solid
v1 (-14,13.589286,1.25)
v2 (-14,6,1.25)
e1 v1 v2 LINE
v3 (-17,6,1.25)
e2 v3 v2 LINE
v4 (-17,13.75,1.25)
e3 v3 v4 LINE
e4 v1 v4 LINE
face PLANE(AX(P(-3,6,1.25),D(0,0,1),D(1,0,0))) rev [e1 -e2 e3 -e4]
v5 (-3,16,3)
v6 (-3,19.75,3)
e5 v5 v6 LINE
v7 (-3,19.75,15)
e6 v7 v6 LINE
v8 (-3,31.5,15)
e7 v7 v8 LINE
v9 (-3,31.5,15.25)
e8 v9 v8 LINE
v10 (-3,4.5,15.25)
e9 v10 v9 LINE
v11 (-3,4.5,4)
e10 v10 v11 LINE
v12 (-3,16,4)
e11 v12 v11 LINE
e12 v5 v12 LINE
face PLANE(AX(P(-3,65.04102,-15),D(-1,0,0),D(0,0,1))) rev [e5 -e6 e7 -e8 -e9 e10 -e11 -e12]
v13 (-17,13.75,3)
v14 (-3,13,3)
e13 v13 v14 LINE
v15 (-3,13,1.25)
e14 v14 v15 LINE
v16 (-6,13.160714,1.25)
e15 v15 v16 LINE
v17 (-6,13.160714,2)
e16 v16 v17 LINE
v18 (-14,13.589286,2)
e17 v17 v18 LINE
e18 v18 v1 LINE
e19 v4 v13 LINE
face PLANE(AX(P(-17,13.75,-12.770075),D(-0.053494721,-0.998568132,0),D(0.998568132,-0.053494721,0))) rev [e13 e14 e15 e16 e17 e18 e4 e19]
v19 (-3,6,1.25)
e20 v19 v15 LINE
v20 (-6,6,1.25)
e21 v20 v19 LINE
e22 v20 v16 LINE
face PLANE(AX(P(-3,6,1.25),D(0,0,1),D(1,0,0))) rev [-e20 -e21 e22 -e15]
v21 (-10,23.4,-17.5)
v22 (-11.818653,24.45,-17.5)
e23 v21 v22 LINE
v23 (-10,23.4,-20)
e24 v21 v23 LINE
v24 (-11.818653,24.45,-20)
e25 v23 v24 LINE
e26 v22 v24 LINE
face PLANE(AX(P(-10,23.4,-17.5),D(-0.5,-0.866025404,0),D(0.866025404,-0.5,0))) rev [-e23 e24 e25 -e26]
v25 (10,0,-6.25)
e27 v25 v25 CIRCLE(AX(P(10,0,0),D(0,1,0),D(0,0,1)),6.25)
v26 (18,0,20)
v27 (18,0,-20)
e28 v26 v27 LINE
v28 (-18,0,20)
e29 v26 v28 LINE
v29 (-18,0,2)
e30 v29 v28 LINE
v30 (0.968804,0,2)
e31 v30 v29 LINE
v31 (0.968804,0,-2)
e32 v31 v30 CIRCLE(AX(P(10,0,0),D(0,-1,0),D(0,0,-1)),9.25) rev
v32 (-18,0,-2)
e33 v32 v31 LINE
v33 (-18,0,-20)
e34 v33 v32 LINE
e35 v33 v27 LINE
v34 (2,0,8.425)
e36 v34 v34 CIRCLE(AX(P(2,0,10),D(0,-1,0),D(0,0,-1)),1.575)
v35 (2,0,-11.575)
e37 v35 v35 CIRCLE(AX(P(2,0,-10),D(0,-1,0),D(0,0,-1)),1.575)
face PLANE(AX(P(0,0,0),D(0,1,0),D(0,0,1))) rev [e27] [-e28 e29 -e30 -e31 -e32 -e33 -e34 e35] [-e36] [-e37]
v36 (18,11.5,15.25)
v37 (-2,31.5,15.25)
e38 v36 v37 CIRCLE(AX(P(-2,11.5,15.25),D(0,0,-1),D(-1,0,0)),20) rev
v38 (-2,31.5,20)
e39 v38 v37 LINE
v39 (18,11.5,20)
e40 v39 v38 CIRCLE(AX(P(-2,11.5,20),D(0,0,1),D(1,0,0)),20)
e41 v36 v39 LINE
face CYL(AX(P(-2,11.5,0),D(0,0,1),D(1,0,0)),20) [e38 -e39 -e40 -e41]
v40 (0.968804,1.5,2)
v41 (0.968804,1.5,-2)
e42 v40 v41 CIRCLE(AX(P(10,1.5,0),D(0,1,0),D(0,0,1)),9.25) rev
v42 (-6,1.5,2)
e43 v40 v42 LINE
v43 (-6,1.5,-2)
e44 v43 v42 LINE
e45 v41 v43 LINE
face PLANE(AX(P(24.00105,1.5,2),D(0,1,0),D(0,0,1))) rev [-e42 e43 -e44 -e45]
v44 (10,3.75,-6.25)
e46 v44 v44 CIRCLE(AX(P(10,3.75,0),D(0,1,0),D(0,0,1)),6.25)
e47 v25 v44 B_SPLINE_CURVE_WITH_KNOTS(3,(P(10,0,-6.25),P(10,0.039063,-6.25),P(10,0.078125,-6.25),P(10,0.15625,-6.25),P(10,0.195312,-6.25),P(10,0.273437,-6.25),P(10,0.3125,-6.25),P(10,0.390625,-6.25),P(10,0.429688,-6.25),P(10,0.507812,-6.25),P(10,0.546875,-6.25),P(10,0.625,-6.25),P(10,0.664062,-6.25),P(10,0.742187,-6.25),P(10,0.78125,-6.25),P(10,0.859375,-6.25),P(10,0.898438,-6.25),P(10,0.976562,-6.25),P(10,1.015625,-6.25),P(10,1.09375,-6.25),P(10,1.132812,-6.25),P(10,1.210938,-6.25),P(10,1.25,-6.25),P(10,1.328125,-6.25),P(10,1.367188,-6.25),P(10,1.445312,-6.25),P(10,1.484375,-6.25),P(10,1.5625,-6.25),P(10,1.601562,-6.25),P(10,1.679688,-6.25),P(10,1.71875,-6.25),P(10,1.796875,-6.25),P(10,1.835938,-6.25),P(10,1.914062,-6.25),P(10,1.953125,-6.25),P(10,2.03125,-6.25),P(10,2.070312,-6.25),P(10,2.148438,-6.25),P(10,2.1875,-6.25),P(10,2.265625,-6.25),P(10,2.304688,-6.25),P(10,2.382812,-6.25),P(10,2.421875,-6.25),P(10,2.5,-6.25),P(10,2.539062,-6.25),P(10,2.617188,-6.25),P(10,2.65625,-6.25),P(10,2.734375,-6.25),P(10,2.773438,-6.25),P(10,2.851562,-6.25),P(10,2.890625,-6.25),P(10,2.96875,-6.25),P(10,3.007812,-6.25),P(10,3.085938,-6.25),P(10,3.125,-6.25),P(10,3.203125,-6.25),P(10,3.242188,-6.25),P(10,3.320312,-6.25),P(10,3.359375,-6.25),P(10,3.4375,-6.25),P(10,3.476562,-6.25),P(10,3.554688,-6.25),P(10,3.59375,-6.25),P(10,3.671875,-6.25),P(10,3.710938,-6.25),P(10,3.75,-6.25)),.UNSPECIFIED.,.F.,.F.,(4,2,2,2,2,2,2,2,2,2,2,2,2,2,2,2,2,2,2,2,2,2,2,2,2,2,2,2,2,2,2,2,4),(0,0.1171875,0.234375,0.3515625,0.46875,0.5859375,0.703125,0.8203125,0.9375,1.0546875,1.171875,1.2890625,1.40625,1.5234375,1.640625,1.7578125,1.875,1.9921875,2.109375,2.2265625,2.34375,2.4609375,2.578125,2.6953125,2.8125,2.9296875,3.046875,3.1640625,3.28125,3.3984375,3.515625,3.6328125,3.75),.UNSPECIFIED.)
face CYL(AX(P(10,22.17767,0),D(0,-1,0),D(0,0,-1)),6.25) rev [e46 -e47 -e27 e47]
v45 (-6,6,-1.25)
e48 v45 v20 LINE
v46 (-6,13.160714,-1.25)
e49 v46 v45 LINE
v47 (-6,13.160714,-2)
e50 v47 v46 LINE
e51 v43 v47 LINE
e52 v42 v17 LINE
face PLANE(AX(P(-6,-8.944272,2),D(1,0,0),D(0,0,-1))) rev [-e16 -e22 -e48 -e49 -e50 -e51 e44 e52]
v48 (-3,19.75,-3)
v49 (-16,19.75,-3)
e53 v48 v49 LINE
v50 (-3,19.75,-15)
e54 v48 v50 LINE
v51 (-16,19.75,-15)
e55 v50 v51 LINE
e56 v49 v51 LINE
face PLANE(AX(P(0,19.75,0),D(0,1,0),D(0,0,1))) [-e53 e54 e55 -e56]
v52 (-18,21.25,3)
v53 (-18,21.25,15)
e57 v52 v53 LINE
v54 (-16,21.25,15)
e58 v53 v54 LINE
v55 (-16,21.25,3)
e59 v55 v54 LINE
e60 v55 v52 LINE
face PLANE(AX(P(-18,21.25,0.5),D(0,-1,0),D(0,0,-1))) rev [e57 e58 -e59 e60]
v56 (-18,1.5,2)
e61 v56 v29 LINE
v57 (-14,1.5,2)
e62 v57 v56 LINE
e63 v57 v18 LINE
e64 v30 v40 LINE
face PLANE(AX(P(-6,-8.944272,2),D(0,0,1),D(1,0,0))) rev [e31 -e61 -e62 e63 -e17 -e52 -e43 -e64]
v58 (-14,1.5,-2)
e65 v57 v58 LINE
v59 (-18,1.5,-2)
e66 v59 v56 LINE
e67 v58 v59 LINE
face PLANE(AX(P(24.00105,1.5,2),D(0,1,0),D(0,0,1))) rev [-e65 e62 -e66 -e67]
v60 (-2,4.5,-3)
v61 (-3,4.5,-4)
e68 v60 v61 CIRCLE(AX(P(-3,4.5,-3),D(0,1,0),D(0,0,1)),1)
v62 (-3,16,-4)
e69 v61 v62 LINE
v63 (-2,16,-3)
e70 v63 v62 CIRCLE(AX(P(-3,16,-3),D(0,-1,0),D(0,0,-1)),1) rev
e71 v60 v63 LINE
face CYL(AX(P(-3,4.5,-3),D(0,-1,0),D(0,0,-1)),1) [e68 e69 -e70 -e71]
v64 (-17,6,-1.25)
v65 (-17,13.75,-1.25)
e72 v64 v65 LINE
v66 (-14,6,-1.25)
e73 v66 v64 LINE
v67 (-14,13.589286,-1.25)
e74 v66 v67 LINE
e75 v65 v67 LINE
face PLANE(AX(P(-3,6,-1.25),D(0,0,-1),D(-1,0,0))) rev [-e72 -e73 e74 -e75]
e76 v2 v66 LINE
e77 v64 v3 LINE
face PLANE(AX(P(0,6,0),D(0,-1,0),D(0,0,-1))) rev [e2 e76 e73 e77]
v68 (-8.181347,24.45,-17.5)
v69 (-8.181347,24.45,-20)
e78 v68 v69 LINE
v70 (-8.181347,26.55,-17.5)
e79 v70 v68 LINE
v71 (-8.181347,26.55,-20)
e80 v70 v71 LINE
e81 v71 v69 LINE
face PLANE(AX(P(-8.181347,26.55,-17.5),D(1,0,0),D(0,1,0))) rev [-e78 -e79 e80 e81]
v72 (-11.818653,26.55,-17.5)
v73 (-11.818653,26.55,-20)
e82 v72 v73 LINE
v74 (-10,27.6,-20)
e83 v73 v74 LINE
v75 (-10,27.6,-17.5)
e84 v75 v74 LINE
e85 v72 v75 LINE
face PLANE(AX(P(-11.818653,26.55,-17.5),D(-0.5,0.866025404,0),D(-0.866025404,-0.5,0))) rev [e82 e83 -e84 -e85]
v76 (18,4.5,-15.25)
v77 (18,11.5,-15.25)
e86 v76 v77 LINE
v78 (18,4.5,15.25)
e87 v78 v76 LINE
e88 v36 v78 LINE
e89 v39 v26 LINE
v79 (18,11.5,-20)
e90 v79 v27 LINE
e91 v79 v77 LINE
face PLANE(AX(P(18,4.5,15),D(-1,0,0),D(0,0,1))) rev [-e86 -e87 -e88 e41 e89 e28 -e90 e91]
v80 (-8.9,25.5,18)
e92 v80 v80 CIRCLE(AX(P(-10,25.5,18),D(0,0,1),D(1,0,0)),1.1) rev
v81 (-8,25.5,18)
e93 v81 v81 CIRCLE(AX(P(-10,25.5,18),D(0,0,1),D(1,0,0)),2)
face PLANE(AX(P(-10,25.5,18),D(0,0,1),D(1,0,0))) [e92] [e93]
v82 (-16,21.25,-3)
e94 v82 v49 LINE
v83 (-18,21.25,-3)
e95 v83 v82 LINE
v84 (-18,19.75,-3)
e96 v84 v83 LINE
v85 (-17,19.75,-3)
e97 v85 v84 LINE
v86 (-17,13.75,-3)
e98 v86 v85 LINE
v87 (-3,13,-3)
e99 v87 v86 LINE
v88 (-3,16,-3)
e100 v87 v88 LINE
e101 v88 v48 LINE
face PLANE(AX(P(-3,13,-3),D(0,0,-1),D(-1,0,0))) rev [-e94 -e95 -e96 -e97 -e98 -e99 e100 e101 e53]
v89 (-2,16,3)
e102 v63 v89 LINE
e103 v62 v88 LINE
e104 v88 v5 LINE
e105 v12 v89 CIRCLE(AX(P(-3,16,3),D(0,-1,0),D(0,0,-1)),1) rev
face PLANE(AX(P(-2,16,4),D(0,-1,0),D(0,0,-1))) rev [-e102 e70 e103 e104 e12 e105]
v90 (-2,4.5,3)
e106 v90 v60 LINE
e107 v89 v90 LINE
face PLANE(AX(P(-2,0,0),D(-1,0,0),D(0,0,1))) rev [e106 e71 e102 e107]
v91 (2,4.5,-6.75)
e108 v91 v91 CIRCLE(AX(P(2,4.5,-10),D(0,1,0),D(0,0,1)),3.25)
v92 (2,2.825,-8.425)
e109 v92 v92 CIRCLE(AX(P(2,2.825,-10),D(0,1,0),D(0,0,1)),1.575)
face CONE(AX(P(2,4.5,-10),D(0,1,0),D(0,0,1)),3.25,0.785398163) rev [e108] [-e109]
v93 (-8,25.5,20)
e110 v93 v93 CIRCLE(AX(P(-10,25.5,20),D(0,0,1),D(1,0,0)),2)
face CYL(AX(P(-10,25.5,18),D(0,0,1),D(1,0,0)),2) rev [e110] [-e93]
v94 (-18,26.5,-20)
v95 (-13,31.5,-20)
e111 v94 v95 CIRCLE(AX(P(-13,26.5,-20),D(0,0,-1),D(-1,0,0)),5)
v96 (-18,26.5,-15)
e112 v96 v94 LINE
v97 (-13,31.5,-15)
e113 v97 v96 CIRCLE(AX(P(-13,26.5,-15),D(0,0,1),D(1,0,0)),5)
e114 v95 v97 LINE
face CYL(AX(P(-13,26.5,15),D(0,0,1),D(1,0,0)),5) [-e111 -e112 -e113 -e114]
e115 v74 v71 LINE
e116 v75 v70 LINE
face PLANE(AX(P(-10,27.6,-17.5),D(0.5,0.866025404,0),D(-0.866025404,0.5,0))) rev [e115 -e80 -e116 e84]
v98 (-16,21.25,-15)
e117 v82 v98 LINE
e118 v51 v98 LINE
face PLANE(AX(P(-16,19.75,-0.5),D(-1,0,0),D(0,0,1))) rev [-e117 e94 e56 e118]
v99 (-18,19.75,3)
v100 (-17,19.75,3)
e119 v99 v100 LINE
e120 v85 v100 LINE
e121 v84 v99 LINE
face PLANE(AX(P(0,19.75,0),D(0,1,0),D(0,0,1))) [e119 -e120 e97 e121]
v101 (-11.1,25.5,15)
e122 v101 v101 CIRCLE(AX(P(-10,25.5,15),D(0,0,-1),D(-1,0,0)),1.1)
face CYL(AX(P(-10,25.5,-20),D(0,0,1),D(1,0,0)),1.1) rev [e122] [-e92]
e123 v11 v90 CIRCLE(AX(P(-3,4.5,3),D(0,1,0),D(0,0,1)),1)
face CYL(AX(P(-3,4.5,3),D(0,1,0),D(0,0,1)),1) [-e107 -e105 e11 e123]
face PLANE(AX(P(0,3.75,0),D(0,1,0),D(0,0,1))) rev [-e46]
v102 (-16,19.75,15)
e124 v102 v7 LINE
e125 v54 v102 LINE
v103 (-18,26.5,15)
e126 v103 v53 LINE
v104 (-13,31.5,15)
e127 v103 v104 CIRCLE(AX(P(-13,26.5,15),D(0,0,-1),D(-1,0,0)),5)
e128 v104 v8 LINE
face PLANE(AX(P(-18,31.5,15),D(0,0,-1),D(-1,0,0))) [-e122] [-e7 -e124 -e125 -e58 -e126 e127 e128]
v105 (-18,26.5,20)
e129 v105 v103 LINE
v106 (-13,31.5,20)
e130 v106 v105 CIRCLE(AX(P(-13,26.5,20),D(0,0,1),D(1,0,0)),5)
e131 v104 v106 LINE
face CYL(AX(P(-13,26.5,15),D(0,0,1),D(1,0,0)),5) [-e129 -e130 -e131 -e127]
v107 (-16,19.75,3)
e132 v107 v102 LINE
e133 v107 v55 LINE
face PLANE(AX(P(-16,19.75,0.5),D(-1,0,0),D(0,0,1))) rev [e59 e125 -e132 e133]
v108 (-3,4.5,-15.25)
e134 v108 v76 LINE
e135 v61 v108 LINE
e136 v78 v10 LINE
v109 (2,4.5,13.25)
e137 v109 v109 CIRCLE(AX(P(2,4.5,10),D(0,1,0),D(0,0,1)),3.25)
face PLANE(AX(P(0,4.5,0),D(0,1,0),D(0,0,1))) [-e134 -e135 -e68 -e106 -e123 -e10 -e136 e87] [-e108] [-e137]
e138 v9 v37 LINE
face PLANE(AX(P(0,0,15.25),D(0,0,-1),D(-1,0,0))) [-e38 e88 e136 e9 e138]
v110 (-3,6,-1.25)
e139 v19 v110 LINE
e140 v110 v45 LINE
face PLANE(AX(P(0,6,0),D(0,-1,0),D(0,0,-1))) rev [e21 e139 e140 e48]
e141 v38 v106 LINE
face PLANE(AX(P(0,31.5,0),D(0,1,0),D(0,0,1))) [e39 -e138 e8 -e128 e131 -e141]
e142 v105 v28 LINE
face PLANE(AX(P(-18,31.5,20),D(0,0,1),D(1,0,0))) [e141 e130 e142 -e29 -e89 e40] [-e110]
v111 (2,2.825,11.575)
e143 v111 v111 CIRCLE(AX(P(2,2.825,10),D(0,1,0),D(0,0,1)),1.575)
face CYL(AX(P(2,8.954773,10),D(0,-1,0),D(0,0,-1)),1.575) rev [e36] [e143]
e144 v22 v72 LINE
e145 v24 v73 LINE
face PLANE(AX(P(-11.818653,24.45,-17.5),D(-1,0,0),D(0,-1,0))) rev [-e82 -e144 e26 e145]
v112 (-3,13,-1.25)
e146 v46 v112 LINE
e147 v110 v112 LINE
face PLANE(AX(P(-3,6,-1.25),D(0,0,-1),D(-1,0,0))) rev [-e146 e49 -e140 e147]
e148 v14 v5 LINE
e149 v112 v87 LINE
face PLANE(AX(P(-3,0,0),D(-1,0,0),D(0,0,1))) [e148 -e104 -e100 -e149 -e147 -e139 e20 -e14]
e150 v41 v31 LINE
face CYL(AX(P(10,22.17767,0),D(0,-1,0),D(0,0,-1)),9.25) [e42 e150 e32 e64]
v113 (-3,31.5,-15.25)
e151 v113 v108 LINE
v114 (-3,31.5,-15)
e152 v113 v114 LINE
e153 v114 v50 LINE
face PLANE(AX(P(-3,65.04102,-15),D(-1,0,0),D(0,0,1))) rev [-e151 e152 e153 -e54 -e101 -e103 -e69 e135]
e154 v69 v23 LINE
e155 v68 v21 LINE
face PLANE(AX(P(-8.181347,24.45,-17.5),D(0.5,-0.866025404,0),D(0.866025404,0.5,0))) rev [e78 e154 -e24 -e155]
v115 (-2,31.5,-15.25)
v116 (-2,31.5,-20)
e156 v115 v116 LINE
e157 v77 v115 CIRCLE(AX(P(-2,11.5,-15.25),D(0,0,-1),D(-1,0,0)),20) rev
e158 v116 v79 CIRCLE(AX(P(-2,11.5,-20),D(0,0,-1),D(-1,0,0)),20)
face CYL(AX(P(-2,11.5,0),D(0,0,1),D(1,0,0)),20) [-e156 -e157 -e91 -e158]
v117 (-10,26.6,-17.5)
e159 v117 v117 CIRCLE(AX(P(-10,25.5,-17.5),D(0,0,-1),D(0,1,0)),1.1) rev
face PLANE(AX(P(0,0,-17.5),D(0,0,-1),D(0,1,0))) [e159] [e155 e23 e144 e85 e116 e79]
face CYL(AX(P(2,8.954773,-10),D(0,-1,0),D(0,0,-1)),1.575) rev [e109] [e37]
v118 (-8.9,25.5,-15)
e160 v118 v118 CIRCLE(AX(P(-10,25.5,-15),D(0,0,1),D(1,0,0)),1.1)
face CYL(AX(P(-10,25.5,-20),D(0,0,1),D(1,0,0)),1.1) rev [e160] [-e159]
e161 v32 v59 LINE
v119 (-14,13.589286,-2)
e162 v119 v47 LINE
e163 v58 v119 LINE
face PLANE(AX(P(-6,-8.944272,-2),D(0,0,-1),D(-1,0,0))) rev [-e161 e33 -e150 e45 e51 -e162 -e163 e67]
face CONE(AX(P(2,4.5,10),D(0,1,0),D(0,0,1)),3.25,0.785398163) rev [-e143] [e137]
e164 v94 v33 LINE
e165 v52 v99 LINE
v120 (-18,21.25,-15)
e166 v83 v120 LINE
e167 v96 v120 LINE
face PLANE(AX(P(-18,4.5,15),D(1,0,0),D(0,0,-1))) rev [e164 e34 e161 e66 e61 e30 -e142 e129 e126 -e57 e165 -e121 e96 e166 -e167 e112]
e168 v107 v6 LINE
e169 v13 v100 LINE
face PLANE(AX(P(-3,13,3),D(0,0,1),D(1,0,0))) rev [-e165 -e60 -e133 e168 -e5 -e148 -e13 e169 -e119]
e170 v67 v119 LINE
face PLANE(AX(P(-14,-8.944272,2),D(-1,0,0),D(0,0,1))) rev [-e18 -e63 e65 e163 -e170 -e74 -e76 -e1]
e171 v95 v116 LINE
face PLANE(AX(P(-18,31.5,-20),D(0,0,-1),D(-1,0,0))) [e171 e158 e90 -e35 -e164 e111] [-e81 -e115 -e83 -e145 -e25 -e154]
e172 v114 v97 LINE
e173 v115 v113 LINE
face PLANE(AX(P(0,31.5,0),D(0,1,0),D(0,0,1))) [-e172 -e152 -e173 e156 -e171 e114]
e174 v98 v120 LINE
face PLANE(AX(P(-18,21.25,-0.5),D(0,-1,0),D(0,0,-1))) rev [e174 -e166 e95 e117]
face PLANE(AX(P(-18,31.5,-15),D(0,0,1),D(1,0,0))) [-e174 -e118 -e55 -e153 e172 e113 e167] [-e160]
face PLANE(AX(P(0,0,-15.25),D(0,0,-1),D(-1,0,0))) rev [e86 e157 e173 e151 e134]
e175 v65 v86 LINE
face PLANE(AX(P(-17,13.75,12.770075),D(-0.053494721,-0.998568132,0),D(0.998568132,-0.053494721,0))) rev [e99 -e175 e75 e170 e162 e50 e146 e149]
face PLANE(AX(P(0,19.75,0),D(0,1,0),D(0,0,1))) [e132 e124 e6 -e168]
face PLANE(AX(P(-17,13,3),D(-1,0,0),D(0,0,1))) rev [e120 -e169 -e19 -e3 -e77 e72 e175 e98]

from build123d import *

# Parameters (mm, degrees)
BASE_W                              = 36
BASE_H                              = 30
BOSS_EXTRUDE1_DEPTH                 = 4.5
WALLS_W                             = 36
WALLS_H                             = 5
WALLS_EXT_DEPTH                     = 31.5
SWITCH_BLOCK_W                      = 15
SWITCH_BLOCK_H                      = 30
SWITCH_BLOCK_EXT_DEPTH              = 15.25
MAGNET_POCKET_R                     = 6.25
MAGNET_POCKET_CUT_DEPTH             = 3.75
FILLET1_R                           = 5
FILLET2_R                           = 5
FILLET3_R                           = 20
FILLET4_R                           = 20
SWITCH_PLACE_W                      = 14
SWITCH_PLACE_H                      = 6
SWITCH_POCKET_DEPTH                 = 6.75
SWITCH_CONTACTS_W                   = 14
SWITCH_CONTACTS_H                   = 2.5
SWITCH_LEADS_DEPTH                  = 7
SWITCH_ANGLE_LEFT_DEPTH             = 1.75
SWITCH_ANGLE_RIGHT_DEPTH            = 1.75
WIRE_GUIDE_W                        = 8
WIRE_GUIDE_H                        = 4
WIRE_PASS_THROUGH_DEPTH             = 6
WIRE_PASS_THROUGH_DIRECTION_2_REACH = 39.071
WIRE_CHANNEL_OUTLINE_W              = 4
WIRE_CHANNEL_OUTLINE_H              = 4
WIRE_CHANNEL_DEPTH                  = 1.5
ACHSE_R                             = 1.1
M2_ACHSE_DEPTH                      = 55.002314765
M2_NUT_DEPTH                        = 2.5
SKETCH2_R                           = 1.575
M3_MOUNTING_SCREWS_DEPTH            = 4.5
SKETCH9_W                           = 2
SKETCH9_H                           = 1.5
BOSS_EXTRUDE3_DEPTH                 = 12
SKETCH10_W                          = 2
SKETCH10_H                          = 1.5
BOSS_EXTRUDE4_DEPTH                 = 12
SKETCH18_W                          = 8
SKETCH18_H                          = 11.5
BOSS_EXTRUDE5_DEPTH                 = 1
FILLET5_R                           = 1
FILLET6_R                           = 1
SKETCH19_W                          = 21
SKETCH19_H                          = 27
CUT_EXTRUDE1_DEPTH                  = 0.25
SKETCH20_W                          = 21
SKETCH20_H                          = 27
CUT_EXTRUDE2_DEPTH                  = 0.25
SKETCH21_R                          = 2
CUT_EXTRUDE3_DEPTH                  = 2


# Read off the part's stored shape, not the designer's step: Wire Channel
with BuildPart() as part:
    # Base → Boss-Extrude1 (new body)
    with BuildSketch(Plane(origin=(0, 0, 0), x_dir=(1, 0, 0), z_dir=(0, 1, 0))):
        Rectangle(BASE_W, BASE_H)
    extrude(amount=BOSS_EXTRUDE1_DEPTH)

    # Walls → Walls Ext (add)
    with BuildSketch(Plane.XZ):
        with Locations((0, 17.5)):
            Rectangle(WALLS_W, WALLS_H)
        with Locations((0, -17.5)):
            Rectangle(WALLS_W, WALLS_H)
    extrude(amount=-WALLS_EXT_DEPTH)

    # Switch Block → Switch Block Ext (add)
    with BuildSketch(Plane(origin=(0, 4.5, 0), x_dir=(1, 0, 0), z_dir=(0, 1, 0))):
        with Locations((-10.5, 0)):
            Rectangle(SWITCH_BLOCK_W, SWITCH_BLOCK_H)
    extrude(amount=SWITCH_BLOCK_EXT_DEPTH)

    # Magnet Pocket → Magnet Pocket Cut (cut)
    with BuildSketch(Plane(origin=(0, 0, 0), x_dir=(1, 0, 0), z_dir=(0, 1, 0))):
        with Locations(Location((10, 0, 0), (0, 0, 90))):
            Circle(MAGNET_POCKET_R)
    extrude(amount=MAGNET_POCKET_CUT_DEPTH, mode=Mode.SUBTRACT)

    # Fillet1
    fillet1_edges = [part.edges().sort_by_distance(p)[0] for p in [
        (-18, 31.5, -17.5),
    ]]
    fillet(fillet1_edges, radius=FILLET1_R)

    # Fillet2
    fillet2_edges = [part.edges().sort_by_distance(p)[0] for p in [
        (-18, 31.5, 17.5),
    ]]
    fillet(fillet2_edges, radius=FILLET2_R)

    # Fillet3
    fillet3_edges = [part.edges().sort_by_distance(p)[0] for p in [
        (18, 31.5, -17.5),
    ]]
    fillet(fillet3_edges, radius=FILLET3_R)

    # Fillet4
    fillet4_edges = [part.edges().sort_by_distance(p)[0] for p in [
        (18, 31.5, 17.5),
    ]]
    fillet(fillet4_edges, radius=FILLET4_R)

    # Switch Place → Switch Pocket (cut)
    with BuildSketch(Plane(origin=(0, 19.75, 0), x_dir=(1, 0, 0), z_dir=(0, 1, 0))):
        with Locations((-10, 0)):
            Rectangle(SWITCH_PLACE_W, SWITCH_PLACE_H)
    extrude(amount=-SWITCH_POCKET_DEPTH, mode=Mode.SUBTRACT)

    # Switch Contacts → Switch Leads (cut)
    with BuildSketch(Plane(origin=(0, 13, 0), x_dir=(1, 0, 0), z_dir=(0, 1, 0))):
        with Locations((-10, 0)):
            Rectangle(SWITCH_CONTACTS_W, SWITCH_CONTACTS_H)
    extrude(amount=-SWITCH_LEADS_DEPTH, mode=Mode.SUBTRACT)

    # Sketch16 → Switch Angle Left (add)
    with BuildSketch(Plane(origin=(0, 0, 3), x_dir=(-1, 0, 0), z_dir=(0, 0, -1))):
        Polygon((17, 13), (17, 13.75), (3, 13), align=None)
    extrude(amount=SWITCH_ANGLE_LEFT_DEPTH)

    # Sketch17 → Switch Angle Right (add)
    with BuildSketch(Plane.XY.offset(-3)):
        Polygon((-17, 13), (-17, 13.75), (-3, 13), align=None)
    extrude(amount=SWITCH_ANGLE_RIGHT_DEPTH)

    # Wire Guide → Wire pass through (cut)
    with BuildSketch(Plane(origin=(0, 6, 0), x_dir=(1, 0, 0), z_dir=(0, 1, 0))):
        with Locations((-10, 0)):
            Rectangle(WIRE_GUIDE_W, WIRE_GUIDE_H)
    extrude(amount=-WIRE_PASS_THROUGH_DEPTH, mode=Mode.SUBTRACT)

    # Wire pass through direction 2: up to this plane
    wire_pass_through_direction_2_end = Plane(origin=(-17, 13.75, -12.770074893), z_dir=(-0.05349472137161193, -0.9985681322700889, 0))
    # Wire Guide → Wire pass through direction 2 (cut, up to the surface)
    with BuildSketch(Plane(origin=(0, 6, 0), x_dir=(1, 0, 0), z_dir=(0, 1, 0)), mode=Mode.PRIVATE) as wire_pass_through_direction_2_sk1:
        with Locations((-10, 0)):
            Rectangle(WIRE_GUIDE_W, WIRE_GUIDE_H)
    wire_pass_through_direction_2_tool1 = split(extrude(wire_pass_through_direction_2_sk1.sketch, amount=WIRE_PASS_THROUGH_DIRECTION_2_REACH, mode=Mode.PRIVATE), bisect_by=wire_pass_through_direction_2_end, keep=Keep.BOTH, mode=Mode.PRIVATE)
    add(wire_pass_through_direction_2_tool1.solids().sort_by_distance((-10, 6, 0))[0], mode=Mode.SUBTRACT)

    # Wire Channel outline → Wire Channel (cut)
    with BuildSketch(Plane(origin=(0, 0, 0), x_dir=(1, 0, 0), z_dir=(0, 1, 0))):
        with Locations((-16, 0)):
            Rectangle(WIRE_CHANNEL_OUTLINE_W, WIRE_CHANNEL_OUTLINE_H)
        with BuildLine():
            Line((-6, 2), (-6, -2))
            Line((-6, -2), (0.968804066, -2))
            ThreePointArc((0.968804066, -2), (0.75, 0), (0.968804066, 2))
            Line((0.968804066, 2), (-6, 2))
        make_face()
    extrude(amount=WIRE_CHANNEL_DEPTH, mode=Mode.SUBTRACT)

    # Achse → M2 Achse (cut, through all)
    with BuildSketch(Plane.XY.offset(20)):
        with Locations((-10, 25.5)):
            Circle(ACHSE_R)
    extrude(amount=-M2_ACHSE_DEPTH, mode=Mode.SUBTRACT)

    # Sketch5 → M2 Nut (cut)
    with BuildSketch(Plane(origin=(0, 0, -20), x_dir=(-1, 0, 0), z_dir=(0, 0, -1))):
        Polygon((10, 27.6), (8.181346652, 26.55), (8.181346652, 24.45), (10, 23.4), (11.818653348, 24.45), (11.818653348, 26.55), align=None)
    extrude(amount=-M2_NUT_DEPTH, mode=Mode.SUBTRACT)

    # Sketch2 → M3 Mounting Screws (cut)
    with BuildSketch(Plane.XZ):
        with Locations(Location((2, -10, 0), (0, 0, 270))):
            Circle(SKETCH2_R)
        with Locations(Location((2, 10, 0), (0, 0, 270))):
            Circle(SKETCH2_R)
    extrude(amount=-M3_MOUNTING_SCREWS_DEPTH, mode=Mode.SUBTRACT)

    # M3 Senkkopf cone 1 section (through the dimple's axis) → M3 Senkkopf (revolve, cut)
    with BuildSketch(Plane(origin=(2, 4.5, 10), x_dir=(0, 0, 1), z_dir=(1, 0, 0))):
        Polygon((0, 0), (3.25, 0), (0, 3.25), align=None)
    revolve(axis=Axis((2, 4.5, 10), (0, -1, 0)), mode=Mode.SUBTRACT)

    # M3 Senkkopf cone 2 section (through the dimple's axis) → M3 Senkkopf cone 2 (revolve, cut)
    with BuildSketch(Plane(origin=(2, 4.5, -10), x_dir=(0, 0, 1), z_dir=(1, 0, 0))):
        Polygon((0, 0), (3.25, 0), (0, 3.25), align=None)
    revolve(axis=Axis((2, 4.5, -10), (0, -1, 0)), mode=Mode.SUBTRACT)

    # Sketch9 → Boss-Extrude3 (add)
    with BuildSketch(Plane.XY.offset(-15)):
        with Locations((-17, 20.5)):
            Rectangle(SKETCH9_W, SKETCH9_H)
    extrude(amount=BOSS_EXTRUDE3_DEPTH)

    # Sketch10 → Boss-Extrude4 (add)
    with BuildSketch(Plane(origin=(0, 0, 15), x_dir=(-1, 0, 0), z_dir=(0, 0, -1))):
        with Locations((17, 20.5)):
            Rectangle(SKETCH10_W, SKETCH10_H)
    extrude(amount=BOSS_EXTRUDE4_DEPTH)

    # Sketch18 → Boss-Extrude5 (add)
    with BuildSketch(Plane(origin=(-3, 0, 0), x_dir=(0, 0, -1), z_dir=(1, 0, 0))):
        with Locations((0, 10.25)):
            Rectangle(SKETCH18_W, SKETCH18_H)
    extrude(amount=BOSS_EXTRUDE5_DEPTH)

    # Fillet5
    fillet5_edges = [part.edges().sort_by_distance(p)[0] for p in [
        (-2, 10.25, 4),
    ]]
    fillet(fillet5_edges, radius=FILLET5_R - 0.0001)  # a hair under: the kernel refuses the full size

    # Fillet6
    fillet6_edges = [part.edges().sort_by_distance(p)[0] for p in [
        (-2, 10.25, -4),
    ]]
    fillet(fillet6_edges, radius=FILLET6_R - 0.0001)  # a hair under: the kernel refuses the full size

    # Sketch19 → Cut-Extrude1 (cut)
    with BuildSketch(Plane(origin=(0, 0, 15), x_dir=(-1, 0, 0), z_dir=(0, 0, -1))):
        with Locations((-7.5, 18)):
            Rectangle(SKETCH19_W, SKETCH19_H)
    extrude(amount=-CUT_EXTRUDE1_DEPTH, mode=Mode.SUBTRACT)

    # Sketch20 → Cut-Extrude2 (cut)
    with BuildSketch(Plane.XY.offset(-15)):
        with Locations((7.5, 18)):
            Rectangle(SKETCH20_W, SKETCH20_H)
    extrude(amount=-CUT_EXTRUDE2_DEPTH, mode=Mode.SUBTRACT)

    # Sketch21 → Cut-Extrude3 (cut)
    with BuildSketch(Plane.XY.offset(20)):
        with Locations((-10, 25.5)):
            Circle(SKETCH21_R)
    extrude(amount=-CUT_EXTRUDE3_DEPTH, mode=Mode.SUBTRACT)


solid = part.part
